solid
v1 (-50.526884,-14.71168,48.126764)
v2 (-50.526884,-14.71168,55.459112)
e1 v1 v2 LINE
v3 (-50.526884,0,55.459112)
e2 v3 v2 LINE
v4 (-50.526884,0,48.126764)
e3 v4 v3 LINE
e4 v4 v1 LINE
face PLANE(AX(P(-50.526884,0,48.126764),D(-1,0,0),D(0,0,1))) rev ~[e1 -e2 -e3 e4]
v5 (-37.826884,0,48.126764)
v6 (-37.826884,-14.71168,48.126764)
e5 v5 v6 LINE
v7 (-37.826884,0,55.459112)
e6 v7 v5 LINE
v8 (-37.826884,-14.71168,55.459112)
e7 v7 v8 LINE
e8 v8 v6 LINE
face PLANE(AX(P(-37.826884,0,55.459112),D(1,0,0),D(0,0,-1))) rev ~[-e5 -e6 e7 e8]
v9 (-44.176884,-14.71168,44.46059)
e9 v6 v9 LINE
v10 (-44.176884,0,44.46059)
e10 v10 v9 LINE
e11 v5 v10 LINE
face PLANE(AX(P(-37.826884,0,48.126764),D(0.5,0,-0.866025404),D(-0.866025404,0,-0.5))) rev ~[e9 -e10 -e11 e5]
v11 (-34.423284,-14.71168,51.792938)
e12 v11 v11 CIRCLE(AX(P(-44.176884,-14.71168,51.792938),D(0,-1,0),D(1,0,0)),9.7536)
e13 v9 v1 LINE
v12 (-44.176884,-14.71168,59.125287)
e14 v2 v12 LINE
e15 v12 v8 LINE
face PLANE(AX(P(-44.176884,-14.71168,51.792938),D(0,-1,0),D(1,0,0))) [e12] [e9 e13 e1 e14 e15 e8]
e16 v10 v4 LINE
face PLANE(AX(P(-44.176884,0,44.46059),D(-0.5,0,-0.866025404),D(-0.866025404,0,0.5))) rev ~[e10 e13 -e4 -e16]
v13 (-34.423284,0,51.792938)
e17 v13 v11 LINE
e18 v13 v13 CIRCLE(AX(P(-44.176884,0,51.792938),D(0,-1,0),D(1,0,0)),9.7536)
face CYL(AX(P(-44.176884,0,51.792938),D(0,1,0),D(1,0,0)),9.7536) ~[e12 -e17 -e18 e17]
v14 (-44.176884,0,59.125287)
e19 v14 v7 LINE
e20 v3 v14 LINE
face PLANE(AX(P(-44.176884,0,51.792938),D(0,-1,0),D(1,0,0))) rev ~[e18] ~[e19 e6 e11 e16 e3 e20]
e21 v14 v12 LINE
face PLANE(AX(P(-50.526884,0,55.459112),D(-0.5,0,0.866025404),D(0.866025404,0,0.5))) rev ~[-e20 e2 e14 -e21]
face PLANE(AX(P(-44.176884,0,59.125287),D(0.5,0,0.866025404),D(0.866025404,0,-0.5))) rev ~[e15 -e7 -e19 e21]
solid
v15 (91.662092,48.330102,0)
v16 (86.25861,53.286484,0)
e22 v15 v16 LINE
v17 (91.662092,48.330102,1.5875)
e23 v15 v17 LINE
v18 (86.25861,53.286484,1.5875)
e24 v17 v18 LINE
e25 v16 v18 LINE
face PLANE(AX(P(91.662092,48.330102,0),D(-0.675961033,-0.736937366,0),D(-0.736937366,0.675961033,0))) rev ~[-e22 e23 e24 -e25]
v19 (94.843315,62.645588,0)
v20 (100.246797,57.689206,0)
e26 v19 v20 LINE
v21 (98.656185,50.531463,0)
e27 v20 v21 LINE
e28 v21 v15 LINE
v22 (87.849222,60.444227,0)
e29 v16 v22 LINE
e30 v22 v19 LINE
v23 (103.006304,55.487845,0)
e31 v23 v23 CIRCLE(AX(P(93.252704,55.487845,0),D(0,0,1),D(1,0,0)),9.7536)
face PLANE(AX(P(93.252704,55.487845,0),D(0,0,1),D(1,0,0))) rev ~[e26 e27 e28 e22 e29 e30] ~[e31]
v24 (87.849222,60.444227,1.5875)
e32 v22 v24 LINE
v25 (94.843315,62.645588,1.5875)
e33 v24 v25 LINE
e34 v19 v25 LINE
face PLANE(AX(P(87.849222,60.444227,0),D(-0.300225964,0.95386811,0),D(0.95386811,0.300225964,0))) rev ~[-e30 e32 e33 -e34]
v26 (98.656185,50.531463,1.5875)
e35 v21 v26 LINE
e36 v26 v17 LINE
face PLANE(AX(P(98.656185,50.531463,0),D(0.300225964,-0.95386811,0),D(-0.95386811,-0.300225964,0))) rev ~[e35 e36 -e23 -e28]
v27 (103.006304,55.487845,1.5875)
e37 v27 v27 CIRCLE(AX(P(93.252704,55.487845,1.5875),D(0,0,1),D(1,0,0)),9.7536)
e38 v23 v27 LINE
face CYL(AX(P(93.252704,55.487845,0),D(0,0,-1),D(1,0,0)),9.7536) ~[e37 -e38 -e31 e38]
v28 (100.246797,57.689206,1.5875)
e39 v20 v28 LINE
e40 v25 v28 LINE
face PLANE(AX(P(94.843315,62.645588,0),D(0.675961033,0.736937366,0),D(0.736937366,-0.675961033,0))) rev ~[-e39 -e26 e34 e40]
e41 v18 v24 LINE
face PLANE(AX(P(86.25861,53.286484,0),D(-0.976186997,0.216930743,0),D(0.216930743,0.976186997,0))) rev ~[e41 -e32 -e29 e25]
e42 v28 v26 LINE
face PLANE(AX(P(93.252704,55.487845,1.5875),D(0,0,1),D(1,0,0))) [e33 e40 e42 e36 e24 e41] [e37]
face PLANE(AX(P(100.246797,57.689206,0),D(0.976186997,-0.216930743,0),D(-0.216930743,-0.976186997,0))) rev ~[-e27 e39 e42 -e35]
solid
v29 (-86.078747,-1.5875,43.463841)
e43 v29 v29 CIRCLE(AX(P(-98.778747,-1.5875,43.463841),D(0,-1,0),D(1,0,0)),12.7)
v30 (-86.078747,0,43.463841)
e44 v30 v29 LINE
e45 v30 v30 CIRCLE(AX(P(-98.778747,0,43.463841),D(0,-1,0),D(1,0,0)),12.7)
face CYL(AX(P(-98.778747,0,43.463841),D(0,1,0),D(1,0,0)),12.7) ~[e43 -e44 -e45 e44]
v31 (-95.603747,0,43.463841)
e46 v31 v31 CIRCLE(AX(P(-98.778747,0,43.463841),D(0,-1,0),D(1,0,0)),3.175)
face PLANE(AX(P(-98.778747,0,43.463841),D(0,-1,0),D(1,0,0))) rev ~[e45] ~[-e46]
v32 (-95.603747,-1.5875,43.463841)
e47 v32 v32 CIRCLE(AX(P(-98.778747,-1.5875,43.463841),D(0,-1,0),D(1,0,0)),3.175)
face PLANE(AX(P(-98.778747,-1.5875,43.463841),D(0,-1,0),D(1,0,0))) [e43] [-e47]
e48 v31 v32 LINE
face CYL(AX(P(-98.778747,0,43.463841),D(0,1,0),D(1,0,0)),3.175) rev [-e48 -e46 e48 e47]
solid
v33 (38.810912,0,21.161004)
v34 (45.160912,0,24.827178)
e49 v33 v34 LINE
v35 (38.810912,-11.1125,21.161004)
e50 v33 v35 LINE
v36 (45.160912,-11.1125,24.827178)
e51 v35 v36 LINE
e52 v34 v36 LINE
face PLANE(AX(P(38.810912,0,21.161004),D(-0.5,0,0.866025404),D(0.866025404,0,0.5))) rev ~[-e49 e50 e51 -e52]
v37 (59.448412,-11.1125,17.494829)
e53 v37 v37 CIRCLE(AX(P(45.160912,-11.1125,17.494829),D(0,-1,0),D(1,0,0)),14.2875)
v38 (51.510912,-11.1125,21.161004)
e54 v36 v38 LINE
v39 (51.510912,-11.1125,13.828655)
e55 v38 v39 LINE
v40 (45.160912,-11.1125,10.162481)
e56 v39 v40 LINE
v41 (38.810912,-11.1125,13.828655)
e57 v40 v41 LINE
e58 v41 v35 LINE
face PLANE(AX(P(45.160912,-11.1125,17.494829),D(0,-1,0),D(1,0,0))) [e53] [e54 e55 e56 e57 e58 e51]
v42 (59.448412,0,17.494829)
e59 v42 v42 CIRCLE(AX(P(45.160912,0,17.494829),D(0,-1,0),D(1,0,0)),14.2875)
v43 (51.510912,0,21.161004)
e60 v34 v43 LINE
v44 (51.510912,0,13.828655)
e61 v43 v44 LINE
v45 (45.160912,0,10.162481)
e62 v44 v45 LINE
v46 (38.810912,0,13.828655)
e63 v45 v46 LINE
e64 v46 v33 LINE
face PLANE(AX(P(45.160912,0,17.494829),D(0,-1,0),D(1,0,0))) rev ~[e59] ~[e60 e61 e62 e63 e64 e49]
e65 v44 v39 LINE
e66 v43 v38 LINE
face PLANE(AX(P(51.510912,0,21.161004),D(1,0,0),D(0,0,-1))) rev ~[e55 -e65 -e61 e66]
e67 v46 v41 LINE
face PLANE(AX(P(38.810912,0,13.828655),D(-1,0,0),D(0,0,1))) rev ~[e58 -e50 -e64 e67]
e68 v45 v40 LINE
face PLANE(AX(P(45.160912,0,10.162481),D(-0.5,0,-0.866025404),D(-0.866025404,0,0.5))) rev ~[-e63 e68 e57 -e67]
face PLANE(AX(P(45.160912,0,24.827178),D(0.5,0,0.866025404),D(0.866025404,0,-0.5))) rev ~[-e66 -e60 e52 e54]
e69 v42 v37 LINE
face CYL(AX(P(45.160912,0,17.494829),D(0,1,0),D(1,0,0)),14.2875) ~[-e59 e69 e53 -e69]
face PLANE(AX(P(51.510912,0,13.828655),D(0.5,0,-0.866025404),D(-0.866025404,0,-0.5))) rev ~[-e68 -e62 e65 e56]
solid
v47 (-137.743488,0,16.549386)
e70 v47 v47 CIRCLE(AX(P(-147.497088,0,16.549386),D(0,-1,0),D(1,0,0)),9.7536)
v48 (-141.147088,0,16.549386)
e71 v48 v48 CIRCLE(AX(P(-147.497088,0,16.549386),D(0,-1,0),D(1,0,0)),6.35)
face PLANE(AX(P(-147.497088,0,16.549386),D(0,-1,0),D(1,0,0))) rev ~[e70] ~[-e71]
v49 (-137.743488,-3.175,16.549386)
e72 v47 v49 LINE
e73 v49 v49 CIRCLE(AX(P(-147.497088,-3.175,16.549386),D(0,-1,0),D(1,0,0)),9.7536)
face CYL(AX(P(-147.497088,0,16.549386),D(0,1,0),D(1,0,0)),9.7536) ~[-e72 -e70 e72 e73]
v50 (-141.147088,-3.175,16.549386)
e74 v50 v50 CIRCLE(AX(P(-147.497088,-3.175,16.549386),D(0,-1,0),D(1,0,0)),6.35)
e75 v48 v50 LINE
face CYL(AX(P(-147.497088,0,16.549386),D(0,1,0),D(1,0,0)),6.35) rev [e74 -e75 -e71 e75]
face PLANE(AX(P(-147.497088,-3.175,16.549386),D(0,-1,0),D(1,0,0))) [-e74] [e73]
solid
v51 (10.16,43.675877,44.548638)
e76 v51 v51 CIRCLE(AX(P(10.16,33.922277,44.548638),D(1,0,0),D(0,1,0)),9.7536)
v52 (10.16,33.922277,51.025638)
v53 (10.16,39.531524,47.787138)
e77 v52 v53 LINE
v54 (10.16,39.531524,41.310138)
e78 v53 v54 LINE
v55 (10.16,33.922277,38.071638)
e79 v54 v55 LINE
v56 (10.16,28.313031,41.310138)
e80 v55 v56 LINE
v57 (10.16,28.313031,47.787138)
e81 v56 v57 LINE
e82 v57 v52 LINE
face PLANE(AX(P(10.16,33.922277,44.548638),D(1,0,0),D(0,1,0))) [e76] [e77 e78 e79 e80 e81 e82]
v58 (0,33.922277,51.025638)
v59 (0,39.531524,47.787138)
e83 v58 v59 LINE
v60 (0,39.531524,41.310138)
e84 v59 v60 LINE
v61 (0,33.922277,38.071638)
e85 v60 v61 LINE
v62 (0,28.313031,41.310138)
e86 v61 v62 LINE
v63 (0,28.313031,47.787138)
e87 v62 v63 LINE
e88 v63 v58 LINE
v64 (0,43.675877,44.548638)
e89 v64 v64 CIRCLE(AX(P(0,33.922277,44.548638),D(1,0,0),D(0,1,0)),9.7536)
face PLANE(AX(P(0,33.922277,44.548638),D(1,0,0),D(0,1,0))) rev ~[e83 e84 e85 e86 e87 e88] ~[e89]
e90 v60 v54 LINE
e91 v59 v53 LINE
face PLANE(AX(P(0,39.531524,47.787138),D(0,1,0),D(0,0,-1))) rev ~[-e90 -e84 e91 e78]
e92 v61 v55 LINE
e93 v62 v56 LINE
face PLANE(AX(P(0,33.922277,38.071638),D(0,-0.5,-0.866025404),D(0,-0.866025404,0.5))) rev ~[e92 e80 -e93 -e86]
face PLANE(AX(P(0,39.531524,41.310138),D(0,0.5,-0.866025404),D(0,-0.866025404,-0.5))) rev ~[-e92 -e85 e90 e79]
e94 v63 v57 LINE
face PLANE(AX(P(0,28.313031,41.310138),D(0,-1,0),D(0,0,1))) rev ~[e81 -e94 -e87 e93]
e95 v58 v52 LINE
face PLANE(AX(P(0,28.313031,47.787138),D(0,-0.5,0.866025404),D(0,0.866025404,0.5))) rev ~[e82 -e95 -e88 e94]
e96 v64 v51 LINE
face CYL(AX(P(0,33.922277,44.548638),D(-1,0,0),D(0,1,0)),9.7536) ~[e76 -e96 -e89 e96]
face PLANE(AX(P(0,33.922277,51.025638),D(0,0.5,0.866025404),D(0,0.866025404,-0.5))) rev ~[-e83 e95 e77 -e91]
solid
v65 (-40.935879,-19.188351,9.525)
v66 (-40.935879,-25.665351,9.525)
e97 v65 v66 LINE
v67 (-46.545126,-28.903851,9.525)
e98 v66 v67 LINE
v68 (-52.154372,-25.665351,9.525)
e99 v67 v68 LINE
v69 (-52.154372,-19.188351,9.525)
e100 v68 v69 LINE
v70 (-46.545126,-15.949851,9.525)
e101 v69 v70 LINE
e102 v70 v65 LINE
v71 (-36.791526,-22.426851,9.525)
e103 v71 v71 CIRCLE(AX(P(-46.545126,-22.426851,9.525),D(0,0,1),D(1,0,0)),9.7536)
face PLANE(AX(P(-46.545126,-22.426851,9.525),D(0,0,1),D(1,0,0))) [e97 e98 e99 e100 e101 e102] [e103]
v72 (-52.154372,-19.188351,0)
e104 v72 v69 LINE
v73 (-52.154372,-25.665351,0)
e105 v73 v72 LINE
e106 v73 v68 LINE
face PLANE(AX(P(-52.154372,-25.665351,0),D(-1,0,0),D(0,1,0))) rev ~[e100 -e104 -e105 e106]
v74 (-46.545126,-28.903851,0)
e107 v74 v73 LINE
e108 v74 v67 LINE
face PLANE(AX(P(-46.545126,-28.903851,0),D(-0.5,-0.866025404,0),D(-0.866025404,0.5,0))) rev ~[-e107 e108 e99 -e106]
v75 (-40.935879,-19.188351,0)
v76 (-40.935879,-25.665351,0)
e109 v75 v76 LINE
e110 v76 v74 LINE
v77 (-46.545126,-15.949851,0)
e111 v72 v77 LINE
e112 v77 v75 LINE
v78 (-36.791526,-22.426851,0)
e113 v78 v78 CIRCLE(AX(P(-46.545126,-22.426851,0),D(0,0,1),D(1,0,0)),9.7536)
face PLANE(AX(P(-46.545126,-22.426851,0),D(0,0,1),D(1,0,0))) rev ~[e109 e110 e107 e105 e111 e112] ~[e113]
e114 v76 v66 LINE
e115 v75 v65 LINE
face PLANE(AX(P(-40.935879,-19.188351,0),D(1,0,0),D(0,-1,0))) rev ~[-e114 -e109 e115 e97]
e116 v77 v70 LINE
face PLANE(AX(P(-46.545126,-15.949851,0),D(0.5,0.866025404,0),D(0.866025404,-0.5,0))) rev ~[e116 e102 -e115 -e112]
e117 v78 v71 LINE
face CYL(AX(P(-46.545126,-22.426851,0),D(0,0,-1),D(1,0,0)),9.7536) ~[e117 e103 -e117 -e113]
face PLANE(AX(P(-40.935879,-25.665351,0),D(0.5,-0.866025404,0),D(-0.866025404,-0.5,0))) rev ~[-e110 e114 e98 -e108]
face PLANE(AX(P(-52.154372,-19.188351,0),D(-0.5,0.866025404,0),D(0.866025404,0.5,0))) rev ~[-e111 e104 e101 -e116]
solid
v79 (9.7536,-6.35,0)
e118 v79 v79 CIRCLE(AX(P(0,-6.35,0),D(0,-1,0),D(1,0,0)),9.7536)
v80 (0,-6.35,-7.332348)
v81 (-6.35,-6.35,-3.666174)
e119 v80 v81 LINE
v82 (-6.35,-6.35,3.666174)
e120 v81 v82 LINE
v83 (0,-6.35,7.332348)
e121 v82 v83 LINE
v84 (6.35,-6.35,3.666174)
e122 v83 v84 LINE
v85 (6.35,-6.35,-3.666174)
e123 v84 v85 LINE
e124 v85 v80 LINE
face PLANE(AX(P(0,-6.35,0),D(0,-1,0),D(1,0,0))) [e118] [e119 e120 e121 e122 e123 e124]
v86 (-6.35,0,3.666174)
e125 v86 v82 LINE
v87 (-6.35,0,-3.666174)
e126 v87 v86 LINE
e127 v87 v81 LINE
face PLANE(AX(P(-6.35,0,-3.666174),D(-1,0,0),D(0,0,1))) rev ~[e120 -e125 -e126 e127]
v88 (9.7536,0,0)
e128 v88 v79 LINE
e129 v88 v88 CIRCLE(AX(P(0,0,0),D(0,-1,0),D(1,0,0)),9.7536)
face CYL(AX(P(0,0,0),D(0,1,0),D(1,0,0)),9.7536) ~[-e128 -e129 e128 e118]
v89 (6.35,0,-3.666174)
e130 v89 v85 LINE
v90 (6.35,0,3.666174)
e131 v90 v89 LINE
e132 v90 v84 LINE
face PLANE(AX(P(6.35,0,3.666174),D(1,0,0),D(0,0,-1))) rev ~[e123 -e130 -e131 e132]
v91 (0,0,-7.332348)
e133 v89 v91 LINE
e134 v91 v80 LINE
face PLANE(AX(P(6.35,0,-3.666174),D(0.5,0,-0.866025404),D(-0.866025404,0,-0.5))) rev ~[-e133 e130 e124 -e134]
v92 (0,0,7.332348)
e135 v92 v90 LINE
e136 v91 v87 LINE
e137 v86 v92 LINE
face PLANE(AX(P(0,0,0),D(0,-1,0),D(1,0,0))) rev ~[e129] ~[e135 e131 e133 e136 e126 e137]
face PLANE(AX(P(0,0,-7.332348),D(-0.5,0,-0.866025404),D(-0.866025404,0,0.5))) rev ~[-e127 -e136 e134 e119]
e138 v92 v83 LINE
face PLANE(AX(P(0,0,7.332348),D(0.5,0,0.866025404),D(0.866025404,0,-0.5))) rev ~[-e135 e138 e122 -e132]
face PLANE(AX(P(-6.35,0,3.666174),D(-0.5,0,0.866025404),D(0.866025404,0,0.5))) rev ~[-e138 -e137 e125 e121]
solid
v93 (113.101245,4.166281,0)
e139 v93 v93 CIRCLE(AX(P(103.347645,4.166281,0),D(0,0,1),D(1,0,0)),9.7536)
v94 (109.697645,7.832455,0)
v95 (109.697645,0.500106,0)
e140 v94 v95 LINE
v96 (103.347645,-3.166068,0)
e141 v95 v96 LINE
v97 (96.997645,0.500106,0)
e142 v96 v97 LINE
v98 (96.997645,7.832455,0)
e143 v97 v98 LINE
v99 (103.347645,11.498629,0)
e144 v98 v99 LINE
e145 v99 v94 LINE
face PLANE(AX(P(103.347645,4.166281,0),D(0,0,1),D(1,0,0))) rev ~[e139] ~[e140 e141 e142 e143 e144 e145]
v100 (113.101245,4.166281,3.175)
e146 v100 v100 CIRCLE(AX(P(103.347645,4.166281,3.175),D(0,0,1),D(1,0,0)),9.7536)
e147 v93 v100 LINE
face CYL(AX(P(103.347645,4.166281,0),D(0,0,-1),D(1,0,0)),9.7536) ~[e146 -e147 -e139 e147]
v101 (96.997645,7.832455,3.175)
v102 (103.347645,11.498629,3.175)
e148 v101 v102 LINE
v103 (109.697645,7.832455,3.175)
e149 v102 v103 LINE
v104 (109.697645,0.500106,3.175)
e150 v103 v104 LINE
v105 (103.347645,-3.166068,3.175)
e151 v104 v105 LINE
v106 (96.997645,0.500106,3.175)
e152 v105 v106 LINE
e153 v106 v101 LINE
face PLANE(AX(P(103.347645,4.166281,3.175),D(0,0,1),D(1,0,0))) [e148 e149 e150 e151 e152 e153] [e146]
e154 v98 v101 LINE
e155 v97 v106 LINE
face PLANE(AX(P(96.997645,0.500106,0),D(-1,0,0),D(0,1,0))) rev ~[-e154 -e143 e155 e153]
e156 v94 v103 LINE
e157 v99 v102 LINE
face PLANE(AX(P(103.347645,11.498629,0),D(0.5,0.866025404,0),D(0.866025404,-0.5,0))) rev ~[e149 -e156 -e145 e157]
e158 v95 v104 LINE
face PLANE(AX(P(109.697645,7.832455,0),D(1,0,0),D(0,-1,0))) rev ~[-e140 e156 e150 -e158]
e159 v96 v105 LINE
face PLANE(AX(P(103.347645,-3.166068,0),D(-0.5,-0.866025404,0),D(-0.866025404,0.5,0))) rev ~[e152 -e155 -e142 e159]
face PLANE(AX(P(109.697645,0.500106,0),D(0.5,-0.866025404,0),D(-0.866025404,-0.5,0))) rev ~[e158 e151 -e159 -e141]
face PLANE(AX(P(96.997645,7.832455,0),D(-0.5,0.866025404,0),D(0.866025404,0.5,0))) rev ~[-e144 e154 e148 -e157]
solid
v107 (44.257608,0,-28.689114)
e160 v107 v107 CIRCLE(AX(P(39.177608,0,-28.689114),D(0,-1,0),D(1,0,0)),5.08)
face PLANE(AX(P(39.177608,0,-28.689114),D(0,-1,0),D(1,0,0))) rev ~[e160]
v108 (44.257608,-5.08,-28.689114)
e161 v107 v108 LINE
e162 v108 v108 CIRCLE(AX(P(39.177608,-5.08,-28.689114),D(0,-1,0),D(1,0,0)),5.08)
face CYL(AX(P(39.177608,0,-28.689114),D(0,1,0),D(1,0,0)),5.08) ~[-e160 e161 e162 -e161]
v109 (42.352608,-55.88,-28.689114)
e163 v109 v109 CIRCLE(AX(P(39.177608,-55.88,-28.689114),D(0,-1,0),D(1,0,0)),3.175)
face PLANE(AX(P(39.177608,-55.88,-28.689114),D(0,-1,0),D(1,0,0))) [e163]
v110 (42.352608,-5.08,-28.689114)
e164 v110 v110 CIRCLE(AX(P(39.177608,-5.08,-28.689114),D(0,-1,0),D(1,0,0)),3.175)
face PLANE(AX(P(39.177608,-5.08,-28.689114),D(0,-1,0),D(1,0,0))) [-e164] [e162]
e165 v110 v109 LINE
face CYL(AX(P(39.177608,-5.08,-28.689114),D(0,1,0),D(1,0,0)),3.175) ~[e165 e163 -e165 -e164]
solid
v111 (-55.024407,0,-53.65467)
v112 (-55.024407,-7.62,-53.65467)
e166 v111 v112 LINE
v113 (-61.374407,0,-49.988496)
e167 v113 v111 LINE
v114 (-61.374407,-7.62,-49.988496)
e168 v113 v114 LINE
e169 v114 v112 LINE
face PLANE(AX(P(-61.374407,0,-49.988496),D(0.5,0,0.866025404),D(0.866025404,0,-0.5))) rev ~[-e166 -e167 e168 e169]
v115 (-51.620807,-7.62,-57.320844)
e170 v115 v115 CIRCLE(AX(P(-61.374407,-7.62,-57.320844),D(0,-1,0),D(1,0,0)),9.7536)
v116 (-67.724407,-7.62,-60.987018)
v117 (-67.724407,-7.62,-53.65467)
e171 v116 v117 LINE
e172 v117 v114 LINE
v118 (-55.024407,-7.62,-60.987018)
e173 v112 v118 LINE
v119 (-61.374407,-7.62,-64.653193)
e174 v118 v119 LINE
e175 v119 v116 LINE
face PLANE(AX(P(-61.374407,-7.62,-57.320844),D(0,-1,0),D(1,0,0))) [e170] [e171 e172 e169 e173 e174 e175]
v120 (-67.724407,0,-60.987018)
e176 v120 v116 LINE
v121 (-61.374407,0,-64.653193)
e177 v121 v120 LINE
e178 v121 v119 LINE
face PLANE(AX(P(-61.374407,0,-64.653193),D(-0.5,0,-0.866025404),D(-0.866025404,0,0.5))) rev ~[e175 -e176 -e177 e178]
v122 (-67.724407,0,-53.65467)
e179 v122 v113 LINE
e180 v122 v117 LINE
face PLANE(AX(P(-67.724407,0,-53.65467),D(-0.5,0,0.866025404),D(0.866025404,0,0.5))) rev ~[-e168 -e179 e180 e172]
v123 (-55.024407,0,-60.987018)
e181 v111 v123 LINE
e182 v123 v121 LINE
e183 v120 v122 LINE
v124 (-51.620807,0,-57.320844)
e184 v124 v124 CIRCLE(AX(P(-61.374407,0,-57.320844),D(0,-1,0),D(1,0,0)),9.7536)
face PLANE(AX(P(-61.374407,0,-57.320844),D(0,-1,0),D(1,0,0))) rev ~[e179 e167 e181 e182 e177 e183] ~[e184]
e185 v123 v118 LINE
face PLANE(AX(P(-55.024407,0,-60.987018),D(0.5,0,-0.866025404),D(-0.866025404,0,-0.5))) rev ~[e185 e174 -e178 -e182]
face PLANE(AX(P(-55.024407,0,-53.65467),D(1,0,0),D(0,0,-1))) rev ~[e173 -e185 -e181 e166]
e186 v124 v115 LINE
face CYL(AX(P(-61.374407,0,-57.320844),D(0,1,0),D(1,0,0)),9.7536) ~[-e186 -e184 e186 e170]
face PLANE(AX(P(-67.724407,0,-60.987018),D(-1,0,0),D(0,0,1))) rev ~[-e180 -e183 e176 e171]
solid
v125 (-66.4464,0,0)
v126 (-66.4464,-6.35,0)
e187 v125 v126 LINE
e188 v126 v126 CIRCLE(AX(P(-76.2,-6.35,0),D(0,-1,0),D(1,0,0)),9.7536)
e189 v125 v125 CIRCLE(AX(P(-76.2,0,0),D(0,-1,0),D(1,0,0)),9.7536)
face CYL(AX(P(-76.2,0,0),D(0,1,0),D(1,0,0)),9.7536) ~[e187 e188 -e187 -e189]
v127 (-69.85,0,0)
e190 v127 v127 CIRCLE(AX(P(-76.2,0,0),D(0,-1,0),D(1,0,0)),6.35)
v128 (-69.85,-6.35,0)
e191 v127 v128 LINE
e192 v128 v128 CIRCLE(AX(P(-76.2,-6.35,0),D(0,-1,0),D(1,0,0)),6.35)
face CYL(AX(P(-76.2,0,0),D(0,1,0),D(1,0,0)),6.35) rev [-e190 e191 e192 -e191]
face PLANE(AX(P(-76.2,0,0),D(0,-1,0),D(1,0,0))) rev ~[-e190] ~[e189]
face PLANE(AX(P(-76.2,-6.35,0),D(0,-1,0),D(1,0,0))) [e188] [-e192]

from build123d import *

# Parameters (mm, degrees)
F0_R      = 9.7536
F1_DEPTH  = 6.35
F2_R      = 9.7536
F3_DEPTH  = 9.525
F4_R      = 9.7536
F5_DEPTH  = 10.16
F6_R      = 9.7536
F7_DEPTH  = 3.175
F8_R      = 9.7536
F8_R_2    = 6.35
F9_DEPTH  = 6.35
F10_R     = 9.7536
F11_DEPTH = 1.5875
F12_R     = 9.7536
F12_R_2   = 6.35
F13_DEPTH = 3.175
F14_R     = 14.2875
F15_DEPTH = 11.1125
F16_R     = 9.7536
F17_DEPTH = 14.71168
F18_R     = 12.7
F18_R_2   = 3.175
F20_DEPTH = 1.5875
F19_R     = 9.7536
F21_DEPTH = 7.62
F22_R     = 5.08
F23_DEPTH = 5.08
F24_R     = 3.175
F25_DEPTH = 50.8


# Not quite as in the source:
# - a length typed as a fraction of an inch, garbled in the dataset ("3 / 203.2 mm" for 3/8 in), is restored


with BuildPart() as f1:
    # F0 (on Front) → F1 (new body)
    with BuildSketch(Plane.XZ):
        Circle(F0_R)
        Polygon((0, 7.3323484187), (6.35, 3.6661742094), (6.35, -3.6661742094), (0, -7.3323484187), (-6.35, -3.6661742094), (-6.35, 3.6661742094), align=None, mode=Mode.SUBTRACT)
    extrude(amount=F1_DEPTH)


with BuildPart() as f3:
    # F2 (on Top) → F3 (new body)
    with BuildSketch(Plane.XY):
        with Locations((-46.5451255441, -22.4268511866)):
            Circle(F2_R)
        Polygon((-46.5451255441, -15.9498511866), (-40.9358790038, -19.1883511866), (-40.9358790038, -25.6653511866), (-46.5451255441, -28.9038511866), (-52.1543720844, -25.6653511866), (-52.1543720844, -19.1883511866), align=None, mode=Mode.SUBTRACT)
    extrude(amount=F3_DEPTH)


with BuildPart() as f5:
    # F4 (on Right) → F5 (new body)
    with BuildSketch(Plane.YZ):
        with Locations((33.922277391, 44.5486380722)):
            Circle(F4_R)
        Polygon((33.922277391, 51.0256380722), (39.5315239313, 47.7871380722), (39.5315239313, 41.3101380722), (33.922277391, 38.0716380722), (28.3130308506, 41.3101380722), (28.3130308506, 47.7871380722), align=None, mode=Mode.SUBTRACT)
    extrude(amount=F5_DEPTH)


with BuildPart() as f7:
    # F6 (on Top) → F7 (new body)
    with BuildSketch(Plane.XY):
        with Locations((103.3476446891, 4.1662805695)):
            Circle(F6_R)
        Polygon((103.3476446891, 11.4986289883), (109.6976446891, 7.8324547789), (109.6976446891, 0.5001063602), (103.3476446891, -3.1660678492), (96.9976446891, 0.5001063602), (96.9976446891, 7.8324547789), align=None, mode=Mode.SUBTRACT)
    extrude(amount=F7_DEPTH)


with BuildPart() as f9:
    # F8 (on Front) → F9 (new body)
    with BuildSketch(Plane.XZ):
        with Locations((-76.2, 0)):
            Circle(F8_R)
        with Locations((-76.2, 0)):
            Circle(F8_R_2, mode=Mode.SUBTRACT)
    extrude(amount=F9_DEPTH)


with BuildPart() as f11:
    # F10 (on Top) → F11 (new body)
    with BuildSketch(Plane.XY):
        with Locations((93.2527035475, 55.487845093)):
            Circle(F10_R)
        Polygon((94.8433153394, 62.6455882751), (100.2467968729, 57.6892064647), (98.656185081, 50.5314632826), (91.6620917556, 48.3301019109), (86.2586102221, 53.2864837213), (87.849222014, 60.4442269034), align=None, mode=Mode.SUBTRACT)
    extrude(amount=F11_DEPTH)


with BuildPart() as f13:
    # F12 (on Front) → F13 (new body)
    with BuildSketch(Plane.XZ):
        with Locations((-147.4970877171, 16.5493860841)):
            Circle(F12_R)
        with Locations((-147.4970877171, 16.5493860841)):
            Circle(F12_R_2, mode=Mode.SUBTRACT)
    extrude(amount=F13_DEPTH)


with BuildPart() as f15:
    # F14 (on Front) → F15 (new body)
    with BuildSketch(Plane.XZ):
        with Locations((45.1609123334, 17.4948293716)):
            Circle(F14_R)
        Polygon((45.1609123334, 24.8271777903), (51.5109123334, 21.1610035809), (51.5109123334, 13.8286551622), (45.1609123334, 10.1624809529), (38.8109123334, 13.8286551622), (38.8109123334, 21.1610035809), align=None, mode=Mode.SUBTRACT)
    extrude(amount=F15_DEPTH)


with BuildPart() as f17:
    # F16 (on Front) → F17 (new body)
    with BuildSketch(Plane.XZ):
        with Locations((-44.1768842667, 51.7929382622)):
            Circle(F16_R)
        Polygon((-44.1768842667, 59.1252866809), (-37.8268842667, 55.4591124716), (-37.8268842667, 48.1267640529), (-44.1768842667, 44.4605898435), (-50.5268842667, 48.1267640529), (-50.5268842667, 55.4591124716), align=None, mode=Mode.SUBTRACT)
    extrude(amount=F17_DEPTH)


with BuildPart() as f20:
    # F18 (on Front) → F20 (new body)
    with BuildSketch(Plane.XZ):
        with Locations((-98.7787470222, 43.4638410807)):
            Circle(F18_R)
        with Locations((-98.7787470222, 43.4638410807)):
            Circle(F18_R_2, mode=Mode.SUBTRACT)
    extrude(amount=F20_DEPTH)


with BuildPart() as f21:
    # F19 (on Front) → F21 (new body)
    with BuildSketch(Plane.XZ):
        with Locations((-61.3744067824, -57.3208441976)):
            Circle(F19_R)
        Polygon((-61.3744067824, -49.9884957789), (-55.0244067824, -53.6546699883), (-55.0244067824, -60.987018407), (-61.3744067824, -64.6531926163), (-67.7244067824, -60.987018407), (-67.7244067824, -53.6546699883), align=None, mode=Mode.SUBTRACT)
    extrude(amount=F21_DEPTH)


with BuildPart() as f23:
    # F22 (on Front) → F23 (new body)
    with BuildSketch(Plane.XZ):
        with Locations((39.1776077449, -28.6891143769)):
            Circle(F22_R)
    extrude(amount=F23_DEPTH)

    # F24 (on face) → F25 (join)
    with BuildSketch(Plane.XZ.offset(5.08)):
        with Locations((39.1776077449, -28.6891143769)):
            Circle(F24_R)
    extrude(amount=F25_DEPTH)


solid = Compound([f1.part, f3.part, f5.part, f7.part, f9.part, f11.part, f13.part, f15.part, f17.part, f20.part, f21.part, f23.part])
